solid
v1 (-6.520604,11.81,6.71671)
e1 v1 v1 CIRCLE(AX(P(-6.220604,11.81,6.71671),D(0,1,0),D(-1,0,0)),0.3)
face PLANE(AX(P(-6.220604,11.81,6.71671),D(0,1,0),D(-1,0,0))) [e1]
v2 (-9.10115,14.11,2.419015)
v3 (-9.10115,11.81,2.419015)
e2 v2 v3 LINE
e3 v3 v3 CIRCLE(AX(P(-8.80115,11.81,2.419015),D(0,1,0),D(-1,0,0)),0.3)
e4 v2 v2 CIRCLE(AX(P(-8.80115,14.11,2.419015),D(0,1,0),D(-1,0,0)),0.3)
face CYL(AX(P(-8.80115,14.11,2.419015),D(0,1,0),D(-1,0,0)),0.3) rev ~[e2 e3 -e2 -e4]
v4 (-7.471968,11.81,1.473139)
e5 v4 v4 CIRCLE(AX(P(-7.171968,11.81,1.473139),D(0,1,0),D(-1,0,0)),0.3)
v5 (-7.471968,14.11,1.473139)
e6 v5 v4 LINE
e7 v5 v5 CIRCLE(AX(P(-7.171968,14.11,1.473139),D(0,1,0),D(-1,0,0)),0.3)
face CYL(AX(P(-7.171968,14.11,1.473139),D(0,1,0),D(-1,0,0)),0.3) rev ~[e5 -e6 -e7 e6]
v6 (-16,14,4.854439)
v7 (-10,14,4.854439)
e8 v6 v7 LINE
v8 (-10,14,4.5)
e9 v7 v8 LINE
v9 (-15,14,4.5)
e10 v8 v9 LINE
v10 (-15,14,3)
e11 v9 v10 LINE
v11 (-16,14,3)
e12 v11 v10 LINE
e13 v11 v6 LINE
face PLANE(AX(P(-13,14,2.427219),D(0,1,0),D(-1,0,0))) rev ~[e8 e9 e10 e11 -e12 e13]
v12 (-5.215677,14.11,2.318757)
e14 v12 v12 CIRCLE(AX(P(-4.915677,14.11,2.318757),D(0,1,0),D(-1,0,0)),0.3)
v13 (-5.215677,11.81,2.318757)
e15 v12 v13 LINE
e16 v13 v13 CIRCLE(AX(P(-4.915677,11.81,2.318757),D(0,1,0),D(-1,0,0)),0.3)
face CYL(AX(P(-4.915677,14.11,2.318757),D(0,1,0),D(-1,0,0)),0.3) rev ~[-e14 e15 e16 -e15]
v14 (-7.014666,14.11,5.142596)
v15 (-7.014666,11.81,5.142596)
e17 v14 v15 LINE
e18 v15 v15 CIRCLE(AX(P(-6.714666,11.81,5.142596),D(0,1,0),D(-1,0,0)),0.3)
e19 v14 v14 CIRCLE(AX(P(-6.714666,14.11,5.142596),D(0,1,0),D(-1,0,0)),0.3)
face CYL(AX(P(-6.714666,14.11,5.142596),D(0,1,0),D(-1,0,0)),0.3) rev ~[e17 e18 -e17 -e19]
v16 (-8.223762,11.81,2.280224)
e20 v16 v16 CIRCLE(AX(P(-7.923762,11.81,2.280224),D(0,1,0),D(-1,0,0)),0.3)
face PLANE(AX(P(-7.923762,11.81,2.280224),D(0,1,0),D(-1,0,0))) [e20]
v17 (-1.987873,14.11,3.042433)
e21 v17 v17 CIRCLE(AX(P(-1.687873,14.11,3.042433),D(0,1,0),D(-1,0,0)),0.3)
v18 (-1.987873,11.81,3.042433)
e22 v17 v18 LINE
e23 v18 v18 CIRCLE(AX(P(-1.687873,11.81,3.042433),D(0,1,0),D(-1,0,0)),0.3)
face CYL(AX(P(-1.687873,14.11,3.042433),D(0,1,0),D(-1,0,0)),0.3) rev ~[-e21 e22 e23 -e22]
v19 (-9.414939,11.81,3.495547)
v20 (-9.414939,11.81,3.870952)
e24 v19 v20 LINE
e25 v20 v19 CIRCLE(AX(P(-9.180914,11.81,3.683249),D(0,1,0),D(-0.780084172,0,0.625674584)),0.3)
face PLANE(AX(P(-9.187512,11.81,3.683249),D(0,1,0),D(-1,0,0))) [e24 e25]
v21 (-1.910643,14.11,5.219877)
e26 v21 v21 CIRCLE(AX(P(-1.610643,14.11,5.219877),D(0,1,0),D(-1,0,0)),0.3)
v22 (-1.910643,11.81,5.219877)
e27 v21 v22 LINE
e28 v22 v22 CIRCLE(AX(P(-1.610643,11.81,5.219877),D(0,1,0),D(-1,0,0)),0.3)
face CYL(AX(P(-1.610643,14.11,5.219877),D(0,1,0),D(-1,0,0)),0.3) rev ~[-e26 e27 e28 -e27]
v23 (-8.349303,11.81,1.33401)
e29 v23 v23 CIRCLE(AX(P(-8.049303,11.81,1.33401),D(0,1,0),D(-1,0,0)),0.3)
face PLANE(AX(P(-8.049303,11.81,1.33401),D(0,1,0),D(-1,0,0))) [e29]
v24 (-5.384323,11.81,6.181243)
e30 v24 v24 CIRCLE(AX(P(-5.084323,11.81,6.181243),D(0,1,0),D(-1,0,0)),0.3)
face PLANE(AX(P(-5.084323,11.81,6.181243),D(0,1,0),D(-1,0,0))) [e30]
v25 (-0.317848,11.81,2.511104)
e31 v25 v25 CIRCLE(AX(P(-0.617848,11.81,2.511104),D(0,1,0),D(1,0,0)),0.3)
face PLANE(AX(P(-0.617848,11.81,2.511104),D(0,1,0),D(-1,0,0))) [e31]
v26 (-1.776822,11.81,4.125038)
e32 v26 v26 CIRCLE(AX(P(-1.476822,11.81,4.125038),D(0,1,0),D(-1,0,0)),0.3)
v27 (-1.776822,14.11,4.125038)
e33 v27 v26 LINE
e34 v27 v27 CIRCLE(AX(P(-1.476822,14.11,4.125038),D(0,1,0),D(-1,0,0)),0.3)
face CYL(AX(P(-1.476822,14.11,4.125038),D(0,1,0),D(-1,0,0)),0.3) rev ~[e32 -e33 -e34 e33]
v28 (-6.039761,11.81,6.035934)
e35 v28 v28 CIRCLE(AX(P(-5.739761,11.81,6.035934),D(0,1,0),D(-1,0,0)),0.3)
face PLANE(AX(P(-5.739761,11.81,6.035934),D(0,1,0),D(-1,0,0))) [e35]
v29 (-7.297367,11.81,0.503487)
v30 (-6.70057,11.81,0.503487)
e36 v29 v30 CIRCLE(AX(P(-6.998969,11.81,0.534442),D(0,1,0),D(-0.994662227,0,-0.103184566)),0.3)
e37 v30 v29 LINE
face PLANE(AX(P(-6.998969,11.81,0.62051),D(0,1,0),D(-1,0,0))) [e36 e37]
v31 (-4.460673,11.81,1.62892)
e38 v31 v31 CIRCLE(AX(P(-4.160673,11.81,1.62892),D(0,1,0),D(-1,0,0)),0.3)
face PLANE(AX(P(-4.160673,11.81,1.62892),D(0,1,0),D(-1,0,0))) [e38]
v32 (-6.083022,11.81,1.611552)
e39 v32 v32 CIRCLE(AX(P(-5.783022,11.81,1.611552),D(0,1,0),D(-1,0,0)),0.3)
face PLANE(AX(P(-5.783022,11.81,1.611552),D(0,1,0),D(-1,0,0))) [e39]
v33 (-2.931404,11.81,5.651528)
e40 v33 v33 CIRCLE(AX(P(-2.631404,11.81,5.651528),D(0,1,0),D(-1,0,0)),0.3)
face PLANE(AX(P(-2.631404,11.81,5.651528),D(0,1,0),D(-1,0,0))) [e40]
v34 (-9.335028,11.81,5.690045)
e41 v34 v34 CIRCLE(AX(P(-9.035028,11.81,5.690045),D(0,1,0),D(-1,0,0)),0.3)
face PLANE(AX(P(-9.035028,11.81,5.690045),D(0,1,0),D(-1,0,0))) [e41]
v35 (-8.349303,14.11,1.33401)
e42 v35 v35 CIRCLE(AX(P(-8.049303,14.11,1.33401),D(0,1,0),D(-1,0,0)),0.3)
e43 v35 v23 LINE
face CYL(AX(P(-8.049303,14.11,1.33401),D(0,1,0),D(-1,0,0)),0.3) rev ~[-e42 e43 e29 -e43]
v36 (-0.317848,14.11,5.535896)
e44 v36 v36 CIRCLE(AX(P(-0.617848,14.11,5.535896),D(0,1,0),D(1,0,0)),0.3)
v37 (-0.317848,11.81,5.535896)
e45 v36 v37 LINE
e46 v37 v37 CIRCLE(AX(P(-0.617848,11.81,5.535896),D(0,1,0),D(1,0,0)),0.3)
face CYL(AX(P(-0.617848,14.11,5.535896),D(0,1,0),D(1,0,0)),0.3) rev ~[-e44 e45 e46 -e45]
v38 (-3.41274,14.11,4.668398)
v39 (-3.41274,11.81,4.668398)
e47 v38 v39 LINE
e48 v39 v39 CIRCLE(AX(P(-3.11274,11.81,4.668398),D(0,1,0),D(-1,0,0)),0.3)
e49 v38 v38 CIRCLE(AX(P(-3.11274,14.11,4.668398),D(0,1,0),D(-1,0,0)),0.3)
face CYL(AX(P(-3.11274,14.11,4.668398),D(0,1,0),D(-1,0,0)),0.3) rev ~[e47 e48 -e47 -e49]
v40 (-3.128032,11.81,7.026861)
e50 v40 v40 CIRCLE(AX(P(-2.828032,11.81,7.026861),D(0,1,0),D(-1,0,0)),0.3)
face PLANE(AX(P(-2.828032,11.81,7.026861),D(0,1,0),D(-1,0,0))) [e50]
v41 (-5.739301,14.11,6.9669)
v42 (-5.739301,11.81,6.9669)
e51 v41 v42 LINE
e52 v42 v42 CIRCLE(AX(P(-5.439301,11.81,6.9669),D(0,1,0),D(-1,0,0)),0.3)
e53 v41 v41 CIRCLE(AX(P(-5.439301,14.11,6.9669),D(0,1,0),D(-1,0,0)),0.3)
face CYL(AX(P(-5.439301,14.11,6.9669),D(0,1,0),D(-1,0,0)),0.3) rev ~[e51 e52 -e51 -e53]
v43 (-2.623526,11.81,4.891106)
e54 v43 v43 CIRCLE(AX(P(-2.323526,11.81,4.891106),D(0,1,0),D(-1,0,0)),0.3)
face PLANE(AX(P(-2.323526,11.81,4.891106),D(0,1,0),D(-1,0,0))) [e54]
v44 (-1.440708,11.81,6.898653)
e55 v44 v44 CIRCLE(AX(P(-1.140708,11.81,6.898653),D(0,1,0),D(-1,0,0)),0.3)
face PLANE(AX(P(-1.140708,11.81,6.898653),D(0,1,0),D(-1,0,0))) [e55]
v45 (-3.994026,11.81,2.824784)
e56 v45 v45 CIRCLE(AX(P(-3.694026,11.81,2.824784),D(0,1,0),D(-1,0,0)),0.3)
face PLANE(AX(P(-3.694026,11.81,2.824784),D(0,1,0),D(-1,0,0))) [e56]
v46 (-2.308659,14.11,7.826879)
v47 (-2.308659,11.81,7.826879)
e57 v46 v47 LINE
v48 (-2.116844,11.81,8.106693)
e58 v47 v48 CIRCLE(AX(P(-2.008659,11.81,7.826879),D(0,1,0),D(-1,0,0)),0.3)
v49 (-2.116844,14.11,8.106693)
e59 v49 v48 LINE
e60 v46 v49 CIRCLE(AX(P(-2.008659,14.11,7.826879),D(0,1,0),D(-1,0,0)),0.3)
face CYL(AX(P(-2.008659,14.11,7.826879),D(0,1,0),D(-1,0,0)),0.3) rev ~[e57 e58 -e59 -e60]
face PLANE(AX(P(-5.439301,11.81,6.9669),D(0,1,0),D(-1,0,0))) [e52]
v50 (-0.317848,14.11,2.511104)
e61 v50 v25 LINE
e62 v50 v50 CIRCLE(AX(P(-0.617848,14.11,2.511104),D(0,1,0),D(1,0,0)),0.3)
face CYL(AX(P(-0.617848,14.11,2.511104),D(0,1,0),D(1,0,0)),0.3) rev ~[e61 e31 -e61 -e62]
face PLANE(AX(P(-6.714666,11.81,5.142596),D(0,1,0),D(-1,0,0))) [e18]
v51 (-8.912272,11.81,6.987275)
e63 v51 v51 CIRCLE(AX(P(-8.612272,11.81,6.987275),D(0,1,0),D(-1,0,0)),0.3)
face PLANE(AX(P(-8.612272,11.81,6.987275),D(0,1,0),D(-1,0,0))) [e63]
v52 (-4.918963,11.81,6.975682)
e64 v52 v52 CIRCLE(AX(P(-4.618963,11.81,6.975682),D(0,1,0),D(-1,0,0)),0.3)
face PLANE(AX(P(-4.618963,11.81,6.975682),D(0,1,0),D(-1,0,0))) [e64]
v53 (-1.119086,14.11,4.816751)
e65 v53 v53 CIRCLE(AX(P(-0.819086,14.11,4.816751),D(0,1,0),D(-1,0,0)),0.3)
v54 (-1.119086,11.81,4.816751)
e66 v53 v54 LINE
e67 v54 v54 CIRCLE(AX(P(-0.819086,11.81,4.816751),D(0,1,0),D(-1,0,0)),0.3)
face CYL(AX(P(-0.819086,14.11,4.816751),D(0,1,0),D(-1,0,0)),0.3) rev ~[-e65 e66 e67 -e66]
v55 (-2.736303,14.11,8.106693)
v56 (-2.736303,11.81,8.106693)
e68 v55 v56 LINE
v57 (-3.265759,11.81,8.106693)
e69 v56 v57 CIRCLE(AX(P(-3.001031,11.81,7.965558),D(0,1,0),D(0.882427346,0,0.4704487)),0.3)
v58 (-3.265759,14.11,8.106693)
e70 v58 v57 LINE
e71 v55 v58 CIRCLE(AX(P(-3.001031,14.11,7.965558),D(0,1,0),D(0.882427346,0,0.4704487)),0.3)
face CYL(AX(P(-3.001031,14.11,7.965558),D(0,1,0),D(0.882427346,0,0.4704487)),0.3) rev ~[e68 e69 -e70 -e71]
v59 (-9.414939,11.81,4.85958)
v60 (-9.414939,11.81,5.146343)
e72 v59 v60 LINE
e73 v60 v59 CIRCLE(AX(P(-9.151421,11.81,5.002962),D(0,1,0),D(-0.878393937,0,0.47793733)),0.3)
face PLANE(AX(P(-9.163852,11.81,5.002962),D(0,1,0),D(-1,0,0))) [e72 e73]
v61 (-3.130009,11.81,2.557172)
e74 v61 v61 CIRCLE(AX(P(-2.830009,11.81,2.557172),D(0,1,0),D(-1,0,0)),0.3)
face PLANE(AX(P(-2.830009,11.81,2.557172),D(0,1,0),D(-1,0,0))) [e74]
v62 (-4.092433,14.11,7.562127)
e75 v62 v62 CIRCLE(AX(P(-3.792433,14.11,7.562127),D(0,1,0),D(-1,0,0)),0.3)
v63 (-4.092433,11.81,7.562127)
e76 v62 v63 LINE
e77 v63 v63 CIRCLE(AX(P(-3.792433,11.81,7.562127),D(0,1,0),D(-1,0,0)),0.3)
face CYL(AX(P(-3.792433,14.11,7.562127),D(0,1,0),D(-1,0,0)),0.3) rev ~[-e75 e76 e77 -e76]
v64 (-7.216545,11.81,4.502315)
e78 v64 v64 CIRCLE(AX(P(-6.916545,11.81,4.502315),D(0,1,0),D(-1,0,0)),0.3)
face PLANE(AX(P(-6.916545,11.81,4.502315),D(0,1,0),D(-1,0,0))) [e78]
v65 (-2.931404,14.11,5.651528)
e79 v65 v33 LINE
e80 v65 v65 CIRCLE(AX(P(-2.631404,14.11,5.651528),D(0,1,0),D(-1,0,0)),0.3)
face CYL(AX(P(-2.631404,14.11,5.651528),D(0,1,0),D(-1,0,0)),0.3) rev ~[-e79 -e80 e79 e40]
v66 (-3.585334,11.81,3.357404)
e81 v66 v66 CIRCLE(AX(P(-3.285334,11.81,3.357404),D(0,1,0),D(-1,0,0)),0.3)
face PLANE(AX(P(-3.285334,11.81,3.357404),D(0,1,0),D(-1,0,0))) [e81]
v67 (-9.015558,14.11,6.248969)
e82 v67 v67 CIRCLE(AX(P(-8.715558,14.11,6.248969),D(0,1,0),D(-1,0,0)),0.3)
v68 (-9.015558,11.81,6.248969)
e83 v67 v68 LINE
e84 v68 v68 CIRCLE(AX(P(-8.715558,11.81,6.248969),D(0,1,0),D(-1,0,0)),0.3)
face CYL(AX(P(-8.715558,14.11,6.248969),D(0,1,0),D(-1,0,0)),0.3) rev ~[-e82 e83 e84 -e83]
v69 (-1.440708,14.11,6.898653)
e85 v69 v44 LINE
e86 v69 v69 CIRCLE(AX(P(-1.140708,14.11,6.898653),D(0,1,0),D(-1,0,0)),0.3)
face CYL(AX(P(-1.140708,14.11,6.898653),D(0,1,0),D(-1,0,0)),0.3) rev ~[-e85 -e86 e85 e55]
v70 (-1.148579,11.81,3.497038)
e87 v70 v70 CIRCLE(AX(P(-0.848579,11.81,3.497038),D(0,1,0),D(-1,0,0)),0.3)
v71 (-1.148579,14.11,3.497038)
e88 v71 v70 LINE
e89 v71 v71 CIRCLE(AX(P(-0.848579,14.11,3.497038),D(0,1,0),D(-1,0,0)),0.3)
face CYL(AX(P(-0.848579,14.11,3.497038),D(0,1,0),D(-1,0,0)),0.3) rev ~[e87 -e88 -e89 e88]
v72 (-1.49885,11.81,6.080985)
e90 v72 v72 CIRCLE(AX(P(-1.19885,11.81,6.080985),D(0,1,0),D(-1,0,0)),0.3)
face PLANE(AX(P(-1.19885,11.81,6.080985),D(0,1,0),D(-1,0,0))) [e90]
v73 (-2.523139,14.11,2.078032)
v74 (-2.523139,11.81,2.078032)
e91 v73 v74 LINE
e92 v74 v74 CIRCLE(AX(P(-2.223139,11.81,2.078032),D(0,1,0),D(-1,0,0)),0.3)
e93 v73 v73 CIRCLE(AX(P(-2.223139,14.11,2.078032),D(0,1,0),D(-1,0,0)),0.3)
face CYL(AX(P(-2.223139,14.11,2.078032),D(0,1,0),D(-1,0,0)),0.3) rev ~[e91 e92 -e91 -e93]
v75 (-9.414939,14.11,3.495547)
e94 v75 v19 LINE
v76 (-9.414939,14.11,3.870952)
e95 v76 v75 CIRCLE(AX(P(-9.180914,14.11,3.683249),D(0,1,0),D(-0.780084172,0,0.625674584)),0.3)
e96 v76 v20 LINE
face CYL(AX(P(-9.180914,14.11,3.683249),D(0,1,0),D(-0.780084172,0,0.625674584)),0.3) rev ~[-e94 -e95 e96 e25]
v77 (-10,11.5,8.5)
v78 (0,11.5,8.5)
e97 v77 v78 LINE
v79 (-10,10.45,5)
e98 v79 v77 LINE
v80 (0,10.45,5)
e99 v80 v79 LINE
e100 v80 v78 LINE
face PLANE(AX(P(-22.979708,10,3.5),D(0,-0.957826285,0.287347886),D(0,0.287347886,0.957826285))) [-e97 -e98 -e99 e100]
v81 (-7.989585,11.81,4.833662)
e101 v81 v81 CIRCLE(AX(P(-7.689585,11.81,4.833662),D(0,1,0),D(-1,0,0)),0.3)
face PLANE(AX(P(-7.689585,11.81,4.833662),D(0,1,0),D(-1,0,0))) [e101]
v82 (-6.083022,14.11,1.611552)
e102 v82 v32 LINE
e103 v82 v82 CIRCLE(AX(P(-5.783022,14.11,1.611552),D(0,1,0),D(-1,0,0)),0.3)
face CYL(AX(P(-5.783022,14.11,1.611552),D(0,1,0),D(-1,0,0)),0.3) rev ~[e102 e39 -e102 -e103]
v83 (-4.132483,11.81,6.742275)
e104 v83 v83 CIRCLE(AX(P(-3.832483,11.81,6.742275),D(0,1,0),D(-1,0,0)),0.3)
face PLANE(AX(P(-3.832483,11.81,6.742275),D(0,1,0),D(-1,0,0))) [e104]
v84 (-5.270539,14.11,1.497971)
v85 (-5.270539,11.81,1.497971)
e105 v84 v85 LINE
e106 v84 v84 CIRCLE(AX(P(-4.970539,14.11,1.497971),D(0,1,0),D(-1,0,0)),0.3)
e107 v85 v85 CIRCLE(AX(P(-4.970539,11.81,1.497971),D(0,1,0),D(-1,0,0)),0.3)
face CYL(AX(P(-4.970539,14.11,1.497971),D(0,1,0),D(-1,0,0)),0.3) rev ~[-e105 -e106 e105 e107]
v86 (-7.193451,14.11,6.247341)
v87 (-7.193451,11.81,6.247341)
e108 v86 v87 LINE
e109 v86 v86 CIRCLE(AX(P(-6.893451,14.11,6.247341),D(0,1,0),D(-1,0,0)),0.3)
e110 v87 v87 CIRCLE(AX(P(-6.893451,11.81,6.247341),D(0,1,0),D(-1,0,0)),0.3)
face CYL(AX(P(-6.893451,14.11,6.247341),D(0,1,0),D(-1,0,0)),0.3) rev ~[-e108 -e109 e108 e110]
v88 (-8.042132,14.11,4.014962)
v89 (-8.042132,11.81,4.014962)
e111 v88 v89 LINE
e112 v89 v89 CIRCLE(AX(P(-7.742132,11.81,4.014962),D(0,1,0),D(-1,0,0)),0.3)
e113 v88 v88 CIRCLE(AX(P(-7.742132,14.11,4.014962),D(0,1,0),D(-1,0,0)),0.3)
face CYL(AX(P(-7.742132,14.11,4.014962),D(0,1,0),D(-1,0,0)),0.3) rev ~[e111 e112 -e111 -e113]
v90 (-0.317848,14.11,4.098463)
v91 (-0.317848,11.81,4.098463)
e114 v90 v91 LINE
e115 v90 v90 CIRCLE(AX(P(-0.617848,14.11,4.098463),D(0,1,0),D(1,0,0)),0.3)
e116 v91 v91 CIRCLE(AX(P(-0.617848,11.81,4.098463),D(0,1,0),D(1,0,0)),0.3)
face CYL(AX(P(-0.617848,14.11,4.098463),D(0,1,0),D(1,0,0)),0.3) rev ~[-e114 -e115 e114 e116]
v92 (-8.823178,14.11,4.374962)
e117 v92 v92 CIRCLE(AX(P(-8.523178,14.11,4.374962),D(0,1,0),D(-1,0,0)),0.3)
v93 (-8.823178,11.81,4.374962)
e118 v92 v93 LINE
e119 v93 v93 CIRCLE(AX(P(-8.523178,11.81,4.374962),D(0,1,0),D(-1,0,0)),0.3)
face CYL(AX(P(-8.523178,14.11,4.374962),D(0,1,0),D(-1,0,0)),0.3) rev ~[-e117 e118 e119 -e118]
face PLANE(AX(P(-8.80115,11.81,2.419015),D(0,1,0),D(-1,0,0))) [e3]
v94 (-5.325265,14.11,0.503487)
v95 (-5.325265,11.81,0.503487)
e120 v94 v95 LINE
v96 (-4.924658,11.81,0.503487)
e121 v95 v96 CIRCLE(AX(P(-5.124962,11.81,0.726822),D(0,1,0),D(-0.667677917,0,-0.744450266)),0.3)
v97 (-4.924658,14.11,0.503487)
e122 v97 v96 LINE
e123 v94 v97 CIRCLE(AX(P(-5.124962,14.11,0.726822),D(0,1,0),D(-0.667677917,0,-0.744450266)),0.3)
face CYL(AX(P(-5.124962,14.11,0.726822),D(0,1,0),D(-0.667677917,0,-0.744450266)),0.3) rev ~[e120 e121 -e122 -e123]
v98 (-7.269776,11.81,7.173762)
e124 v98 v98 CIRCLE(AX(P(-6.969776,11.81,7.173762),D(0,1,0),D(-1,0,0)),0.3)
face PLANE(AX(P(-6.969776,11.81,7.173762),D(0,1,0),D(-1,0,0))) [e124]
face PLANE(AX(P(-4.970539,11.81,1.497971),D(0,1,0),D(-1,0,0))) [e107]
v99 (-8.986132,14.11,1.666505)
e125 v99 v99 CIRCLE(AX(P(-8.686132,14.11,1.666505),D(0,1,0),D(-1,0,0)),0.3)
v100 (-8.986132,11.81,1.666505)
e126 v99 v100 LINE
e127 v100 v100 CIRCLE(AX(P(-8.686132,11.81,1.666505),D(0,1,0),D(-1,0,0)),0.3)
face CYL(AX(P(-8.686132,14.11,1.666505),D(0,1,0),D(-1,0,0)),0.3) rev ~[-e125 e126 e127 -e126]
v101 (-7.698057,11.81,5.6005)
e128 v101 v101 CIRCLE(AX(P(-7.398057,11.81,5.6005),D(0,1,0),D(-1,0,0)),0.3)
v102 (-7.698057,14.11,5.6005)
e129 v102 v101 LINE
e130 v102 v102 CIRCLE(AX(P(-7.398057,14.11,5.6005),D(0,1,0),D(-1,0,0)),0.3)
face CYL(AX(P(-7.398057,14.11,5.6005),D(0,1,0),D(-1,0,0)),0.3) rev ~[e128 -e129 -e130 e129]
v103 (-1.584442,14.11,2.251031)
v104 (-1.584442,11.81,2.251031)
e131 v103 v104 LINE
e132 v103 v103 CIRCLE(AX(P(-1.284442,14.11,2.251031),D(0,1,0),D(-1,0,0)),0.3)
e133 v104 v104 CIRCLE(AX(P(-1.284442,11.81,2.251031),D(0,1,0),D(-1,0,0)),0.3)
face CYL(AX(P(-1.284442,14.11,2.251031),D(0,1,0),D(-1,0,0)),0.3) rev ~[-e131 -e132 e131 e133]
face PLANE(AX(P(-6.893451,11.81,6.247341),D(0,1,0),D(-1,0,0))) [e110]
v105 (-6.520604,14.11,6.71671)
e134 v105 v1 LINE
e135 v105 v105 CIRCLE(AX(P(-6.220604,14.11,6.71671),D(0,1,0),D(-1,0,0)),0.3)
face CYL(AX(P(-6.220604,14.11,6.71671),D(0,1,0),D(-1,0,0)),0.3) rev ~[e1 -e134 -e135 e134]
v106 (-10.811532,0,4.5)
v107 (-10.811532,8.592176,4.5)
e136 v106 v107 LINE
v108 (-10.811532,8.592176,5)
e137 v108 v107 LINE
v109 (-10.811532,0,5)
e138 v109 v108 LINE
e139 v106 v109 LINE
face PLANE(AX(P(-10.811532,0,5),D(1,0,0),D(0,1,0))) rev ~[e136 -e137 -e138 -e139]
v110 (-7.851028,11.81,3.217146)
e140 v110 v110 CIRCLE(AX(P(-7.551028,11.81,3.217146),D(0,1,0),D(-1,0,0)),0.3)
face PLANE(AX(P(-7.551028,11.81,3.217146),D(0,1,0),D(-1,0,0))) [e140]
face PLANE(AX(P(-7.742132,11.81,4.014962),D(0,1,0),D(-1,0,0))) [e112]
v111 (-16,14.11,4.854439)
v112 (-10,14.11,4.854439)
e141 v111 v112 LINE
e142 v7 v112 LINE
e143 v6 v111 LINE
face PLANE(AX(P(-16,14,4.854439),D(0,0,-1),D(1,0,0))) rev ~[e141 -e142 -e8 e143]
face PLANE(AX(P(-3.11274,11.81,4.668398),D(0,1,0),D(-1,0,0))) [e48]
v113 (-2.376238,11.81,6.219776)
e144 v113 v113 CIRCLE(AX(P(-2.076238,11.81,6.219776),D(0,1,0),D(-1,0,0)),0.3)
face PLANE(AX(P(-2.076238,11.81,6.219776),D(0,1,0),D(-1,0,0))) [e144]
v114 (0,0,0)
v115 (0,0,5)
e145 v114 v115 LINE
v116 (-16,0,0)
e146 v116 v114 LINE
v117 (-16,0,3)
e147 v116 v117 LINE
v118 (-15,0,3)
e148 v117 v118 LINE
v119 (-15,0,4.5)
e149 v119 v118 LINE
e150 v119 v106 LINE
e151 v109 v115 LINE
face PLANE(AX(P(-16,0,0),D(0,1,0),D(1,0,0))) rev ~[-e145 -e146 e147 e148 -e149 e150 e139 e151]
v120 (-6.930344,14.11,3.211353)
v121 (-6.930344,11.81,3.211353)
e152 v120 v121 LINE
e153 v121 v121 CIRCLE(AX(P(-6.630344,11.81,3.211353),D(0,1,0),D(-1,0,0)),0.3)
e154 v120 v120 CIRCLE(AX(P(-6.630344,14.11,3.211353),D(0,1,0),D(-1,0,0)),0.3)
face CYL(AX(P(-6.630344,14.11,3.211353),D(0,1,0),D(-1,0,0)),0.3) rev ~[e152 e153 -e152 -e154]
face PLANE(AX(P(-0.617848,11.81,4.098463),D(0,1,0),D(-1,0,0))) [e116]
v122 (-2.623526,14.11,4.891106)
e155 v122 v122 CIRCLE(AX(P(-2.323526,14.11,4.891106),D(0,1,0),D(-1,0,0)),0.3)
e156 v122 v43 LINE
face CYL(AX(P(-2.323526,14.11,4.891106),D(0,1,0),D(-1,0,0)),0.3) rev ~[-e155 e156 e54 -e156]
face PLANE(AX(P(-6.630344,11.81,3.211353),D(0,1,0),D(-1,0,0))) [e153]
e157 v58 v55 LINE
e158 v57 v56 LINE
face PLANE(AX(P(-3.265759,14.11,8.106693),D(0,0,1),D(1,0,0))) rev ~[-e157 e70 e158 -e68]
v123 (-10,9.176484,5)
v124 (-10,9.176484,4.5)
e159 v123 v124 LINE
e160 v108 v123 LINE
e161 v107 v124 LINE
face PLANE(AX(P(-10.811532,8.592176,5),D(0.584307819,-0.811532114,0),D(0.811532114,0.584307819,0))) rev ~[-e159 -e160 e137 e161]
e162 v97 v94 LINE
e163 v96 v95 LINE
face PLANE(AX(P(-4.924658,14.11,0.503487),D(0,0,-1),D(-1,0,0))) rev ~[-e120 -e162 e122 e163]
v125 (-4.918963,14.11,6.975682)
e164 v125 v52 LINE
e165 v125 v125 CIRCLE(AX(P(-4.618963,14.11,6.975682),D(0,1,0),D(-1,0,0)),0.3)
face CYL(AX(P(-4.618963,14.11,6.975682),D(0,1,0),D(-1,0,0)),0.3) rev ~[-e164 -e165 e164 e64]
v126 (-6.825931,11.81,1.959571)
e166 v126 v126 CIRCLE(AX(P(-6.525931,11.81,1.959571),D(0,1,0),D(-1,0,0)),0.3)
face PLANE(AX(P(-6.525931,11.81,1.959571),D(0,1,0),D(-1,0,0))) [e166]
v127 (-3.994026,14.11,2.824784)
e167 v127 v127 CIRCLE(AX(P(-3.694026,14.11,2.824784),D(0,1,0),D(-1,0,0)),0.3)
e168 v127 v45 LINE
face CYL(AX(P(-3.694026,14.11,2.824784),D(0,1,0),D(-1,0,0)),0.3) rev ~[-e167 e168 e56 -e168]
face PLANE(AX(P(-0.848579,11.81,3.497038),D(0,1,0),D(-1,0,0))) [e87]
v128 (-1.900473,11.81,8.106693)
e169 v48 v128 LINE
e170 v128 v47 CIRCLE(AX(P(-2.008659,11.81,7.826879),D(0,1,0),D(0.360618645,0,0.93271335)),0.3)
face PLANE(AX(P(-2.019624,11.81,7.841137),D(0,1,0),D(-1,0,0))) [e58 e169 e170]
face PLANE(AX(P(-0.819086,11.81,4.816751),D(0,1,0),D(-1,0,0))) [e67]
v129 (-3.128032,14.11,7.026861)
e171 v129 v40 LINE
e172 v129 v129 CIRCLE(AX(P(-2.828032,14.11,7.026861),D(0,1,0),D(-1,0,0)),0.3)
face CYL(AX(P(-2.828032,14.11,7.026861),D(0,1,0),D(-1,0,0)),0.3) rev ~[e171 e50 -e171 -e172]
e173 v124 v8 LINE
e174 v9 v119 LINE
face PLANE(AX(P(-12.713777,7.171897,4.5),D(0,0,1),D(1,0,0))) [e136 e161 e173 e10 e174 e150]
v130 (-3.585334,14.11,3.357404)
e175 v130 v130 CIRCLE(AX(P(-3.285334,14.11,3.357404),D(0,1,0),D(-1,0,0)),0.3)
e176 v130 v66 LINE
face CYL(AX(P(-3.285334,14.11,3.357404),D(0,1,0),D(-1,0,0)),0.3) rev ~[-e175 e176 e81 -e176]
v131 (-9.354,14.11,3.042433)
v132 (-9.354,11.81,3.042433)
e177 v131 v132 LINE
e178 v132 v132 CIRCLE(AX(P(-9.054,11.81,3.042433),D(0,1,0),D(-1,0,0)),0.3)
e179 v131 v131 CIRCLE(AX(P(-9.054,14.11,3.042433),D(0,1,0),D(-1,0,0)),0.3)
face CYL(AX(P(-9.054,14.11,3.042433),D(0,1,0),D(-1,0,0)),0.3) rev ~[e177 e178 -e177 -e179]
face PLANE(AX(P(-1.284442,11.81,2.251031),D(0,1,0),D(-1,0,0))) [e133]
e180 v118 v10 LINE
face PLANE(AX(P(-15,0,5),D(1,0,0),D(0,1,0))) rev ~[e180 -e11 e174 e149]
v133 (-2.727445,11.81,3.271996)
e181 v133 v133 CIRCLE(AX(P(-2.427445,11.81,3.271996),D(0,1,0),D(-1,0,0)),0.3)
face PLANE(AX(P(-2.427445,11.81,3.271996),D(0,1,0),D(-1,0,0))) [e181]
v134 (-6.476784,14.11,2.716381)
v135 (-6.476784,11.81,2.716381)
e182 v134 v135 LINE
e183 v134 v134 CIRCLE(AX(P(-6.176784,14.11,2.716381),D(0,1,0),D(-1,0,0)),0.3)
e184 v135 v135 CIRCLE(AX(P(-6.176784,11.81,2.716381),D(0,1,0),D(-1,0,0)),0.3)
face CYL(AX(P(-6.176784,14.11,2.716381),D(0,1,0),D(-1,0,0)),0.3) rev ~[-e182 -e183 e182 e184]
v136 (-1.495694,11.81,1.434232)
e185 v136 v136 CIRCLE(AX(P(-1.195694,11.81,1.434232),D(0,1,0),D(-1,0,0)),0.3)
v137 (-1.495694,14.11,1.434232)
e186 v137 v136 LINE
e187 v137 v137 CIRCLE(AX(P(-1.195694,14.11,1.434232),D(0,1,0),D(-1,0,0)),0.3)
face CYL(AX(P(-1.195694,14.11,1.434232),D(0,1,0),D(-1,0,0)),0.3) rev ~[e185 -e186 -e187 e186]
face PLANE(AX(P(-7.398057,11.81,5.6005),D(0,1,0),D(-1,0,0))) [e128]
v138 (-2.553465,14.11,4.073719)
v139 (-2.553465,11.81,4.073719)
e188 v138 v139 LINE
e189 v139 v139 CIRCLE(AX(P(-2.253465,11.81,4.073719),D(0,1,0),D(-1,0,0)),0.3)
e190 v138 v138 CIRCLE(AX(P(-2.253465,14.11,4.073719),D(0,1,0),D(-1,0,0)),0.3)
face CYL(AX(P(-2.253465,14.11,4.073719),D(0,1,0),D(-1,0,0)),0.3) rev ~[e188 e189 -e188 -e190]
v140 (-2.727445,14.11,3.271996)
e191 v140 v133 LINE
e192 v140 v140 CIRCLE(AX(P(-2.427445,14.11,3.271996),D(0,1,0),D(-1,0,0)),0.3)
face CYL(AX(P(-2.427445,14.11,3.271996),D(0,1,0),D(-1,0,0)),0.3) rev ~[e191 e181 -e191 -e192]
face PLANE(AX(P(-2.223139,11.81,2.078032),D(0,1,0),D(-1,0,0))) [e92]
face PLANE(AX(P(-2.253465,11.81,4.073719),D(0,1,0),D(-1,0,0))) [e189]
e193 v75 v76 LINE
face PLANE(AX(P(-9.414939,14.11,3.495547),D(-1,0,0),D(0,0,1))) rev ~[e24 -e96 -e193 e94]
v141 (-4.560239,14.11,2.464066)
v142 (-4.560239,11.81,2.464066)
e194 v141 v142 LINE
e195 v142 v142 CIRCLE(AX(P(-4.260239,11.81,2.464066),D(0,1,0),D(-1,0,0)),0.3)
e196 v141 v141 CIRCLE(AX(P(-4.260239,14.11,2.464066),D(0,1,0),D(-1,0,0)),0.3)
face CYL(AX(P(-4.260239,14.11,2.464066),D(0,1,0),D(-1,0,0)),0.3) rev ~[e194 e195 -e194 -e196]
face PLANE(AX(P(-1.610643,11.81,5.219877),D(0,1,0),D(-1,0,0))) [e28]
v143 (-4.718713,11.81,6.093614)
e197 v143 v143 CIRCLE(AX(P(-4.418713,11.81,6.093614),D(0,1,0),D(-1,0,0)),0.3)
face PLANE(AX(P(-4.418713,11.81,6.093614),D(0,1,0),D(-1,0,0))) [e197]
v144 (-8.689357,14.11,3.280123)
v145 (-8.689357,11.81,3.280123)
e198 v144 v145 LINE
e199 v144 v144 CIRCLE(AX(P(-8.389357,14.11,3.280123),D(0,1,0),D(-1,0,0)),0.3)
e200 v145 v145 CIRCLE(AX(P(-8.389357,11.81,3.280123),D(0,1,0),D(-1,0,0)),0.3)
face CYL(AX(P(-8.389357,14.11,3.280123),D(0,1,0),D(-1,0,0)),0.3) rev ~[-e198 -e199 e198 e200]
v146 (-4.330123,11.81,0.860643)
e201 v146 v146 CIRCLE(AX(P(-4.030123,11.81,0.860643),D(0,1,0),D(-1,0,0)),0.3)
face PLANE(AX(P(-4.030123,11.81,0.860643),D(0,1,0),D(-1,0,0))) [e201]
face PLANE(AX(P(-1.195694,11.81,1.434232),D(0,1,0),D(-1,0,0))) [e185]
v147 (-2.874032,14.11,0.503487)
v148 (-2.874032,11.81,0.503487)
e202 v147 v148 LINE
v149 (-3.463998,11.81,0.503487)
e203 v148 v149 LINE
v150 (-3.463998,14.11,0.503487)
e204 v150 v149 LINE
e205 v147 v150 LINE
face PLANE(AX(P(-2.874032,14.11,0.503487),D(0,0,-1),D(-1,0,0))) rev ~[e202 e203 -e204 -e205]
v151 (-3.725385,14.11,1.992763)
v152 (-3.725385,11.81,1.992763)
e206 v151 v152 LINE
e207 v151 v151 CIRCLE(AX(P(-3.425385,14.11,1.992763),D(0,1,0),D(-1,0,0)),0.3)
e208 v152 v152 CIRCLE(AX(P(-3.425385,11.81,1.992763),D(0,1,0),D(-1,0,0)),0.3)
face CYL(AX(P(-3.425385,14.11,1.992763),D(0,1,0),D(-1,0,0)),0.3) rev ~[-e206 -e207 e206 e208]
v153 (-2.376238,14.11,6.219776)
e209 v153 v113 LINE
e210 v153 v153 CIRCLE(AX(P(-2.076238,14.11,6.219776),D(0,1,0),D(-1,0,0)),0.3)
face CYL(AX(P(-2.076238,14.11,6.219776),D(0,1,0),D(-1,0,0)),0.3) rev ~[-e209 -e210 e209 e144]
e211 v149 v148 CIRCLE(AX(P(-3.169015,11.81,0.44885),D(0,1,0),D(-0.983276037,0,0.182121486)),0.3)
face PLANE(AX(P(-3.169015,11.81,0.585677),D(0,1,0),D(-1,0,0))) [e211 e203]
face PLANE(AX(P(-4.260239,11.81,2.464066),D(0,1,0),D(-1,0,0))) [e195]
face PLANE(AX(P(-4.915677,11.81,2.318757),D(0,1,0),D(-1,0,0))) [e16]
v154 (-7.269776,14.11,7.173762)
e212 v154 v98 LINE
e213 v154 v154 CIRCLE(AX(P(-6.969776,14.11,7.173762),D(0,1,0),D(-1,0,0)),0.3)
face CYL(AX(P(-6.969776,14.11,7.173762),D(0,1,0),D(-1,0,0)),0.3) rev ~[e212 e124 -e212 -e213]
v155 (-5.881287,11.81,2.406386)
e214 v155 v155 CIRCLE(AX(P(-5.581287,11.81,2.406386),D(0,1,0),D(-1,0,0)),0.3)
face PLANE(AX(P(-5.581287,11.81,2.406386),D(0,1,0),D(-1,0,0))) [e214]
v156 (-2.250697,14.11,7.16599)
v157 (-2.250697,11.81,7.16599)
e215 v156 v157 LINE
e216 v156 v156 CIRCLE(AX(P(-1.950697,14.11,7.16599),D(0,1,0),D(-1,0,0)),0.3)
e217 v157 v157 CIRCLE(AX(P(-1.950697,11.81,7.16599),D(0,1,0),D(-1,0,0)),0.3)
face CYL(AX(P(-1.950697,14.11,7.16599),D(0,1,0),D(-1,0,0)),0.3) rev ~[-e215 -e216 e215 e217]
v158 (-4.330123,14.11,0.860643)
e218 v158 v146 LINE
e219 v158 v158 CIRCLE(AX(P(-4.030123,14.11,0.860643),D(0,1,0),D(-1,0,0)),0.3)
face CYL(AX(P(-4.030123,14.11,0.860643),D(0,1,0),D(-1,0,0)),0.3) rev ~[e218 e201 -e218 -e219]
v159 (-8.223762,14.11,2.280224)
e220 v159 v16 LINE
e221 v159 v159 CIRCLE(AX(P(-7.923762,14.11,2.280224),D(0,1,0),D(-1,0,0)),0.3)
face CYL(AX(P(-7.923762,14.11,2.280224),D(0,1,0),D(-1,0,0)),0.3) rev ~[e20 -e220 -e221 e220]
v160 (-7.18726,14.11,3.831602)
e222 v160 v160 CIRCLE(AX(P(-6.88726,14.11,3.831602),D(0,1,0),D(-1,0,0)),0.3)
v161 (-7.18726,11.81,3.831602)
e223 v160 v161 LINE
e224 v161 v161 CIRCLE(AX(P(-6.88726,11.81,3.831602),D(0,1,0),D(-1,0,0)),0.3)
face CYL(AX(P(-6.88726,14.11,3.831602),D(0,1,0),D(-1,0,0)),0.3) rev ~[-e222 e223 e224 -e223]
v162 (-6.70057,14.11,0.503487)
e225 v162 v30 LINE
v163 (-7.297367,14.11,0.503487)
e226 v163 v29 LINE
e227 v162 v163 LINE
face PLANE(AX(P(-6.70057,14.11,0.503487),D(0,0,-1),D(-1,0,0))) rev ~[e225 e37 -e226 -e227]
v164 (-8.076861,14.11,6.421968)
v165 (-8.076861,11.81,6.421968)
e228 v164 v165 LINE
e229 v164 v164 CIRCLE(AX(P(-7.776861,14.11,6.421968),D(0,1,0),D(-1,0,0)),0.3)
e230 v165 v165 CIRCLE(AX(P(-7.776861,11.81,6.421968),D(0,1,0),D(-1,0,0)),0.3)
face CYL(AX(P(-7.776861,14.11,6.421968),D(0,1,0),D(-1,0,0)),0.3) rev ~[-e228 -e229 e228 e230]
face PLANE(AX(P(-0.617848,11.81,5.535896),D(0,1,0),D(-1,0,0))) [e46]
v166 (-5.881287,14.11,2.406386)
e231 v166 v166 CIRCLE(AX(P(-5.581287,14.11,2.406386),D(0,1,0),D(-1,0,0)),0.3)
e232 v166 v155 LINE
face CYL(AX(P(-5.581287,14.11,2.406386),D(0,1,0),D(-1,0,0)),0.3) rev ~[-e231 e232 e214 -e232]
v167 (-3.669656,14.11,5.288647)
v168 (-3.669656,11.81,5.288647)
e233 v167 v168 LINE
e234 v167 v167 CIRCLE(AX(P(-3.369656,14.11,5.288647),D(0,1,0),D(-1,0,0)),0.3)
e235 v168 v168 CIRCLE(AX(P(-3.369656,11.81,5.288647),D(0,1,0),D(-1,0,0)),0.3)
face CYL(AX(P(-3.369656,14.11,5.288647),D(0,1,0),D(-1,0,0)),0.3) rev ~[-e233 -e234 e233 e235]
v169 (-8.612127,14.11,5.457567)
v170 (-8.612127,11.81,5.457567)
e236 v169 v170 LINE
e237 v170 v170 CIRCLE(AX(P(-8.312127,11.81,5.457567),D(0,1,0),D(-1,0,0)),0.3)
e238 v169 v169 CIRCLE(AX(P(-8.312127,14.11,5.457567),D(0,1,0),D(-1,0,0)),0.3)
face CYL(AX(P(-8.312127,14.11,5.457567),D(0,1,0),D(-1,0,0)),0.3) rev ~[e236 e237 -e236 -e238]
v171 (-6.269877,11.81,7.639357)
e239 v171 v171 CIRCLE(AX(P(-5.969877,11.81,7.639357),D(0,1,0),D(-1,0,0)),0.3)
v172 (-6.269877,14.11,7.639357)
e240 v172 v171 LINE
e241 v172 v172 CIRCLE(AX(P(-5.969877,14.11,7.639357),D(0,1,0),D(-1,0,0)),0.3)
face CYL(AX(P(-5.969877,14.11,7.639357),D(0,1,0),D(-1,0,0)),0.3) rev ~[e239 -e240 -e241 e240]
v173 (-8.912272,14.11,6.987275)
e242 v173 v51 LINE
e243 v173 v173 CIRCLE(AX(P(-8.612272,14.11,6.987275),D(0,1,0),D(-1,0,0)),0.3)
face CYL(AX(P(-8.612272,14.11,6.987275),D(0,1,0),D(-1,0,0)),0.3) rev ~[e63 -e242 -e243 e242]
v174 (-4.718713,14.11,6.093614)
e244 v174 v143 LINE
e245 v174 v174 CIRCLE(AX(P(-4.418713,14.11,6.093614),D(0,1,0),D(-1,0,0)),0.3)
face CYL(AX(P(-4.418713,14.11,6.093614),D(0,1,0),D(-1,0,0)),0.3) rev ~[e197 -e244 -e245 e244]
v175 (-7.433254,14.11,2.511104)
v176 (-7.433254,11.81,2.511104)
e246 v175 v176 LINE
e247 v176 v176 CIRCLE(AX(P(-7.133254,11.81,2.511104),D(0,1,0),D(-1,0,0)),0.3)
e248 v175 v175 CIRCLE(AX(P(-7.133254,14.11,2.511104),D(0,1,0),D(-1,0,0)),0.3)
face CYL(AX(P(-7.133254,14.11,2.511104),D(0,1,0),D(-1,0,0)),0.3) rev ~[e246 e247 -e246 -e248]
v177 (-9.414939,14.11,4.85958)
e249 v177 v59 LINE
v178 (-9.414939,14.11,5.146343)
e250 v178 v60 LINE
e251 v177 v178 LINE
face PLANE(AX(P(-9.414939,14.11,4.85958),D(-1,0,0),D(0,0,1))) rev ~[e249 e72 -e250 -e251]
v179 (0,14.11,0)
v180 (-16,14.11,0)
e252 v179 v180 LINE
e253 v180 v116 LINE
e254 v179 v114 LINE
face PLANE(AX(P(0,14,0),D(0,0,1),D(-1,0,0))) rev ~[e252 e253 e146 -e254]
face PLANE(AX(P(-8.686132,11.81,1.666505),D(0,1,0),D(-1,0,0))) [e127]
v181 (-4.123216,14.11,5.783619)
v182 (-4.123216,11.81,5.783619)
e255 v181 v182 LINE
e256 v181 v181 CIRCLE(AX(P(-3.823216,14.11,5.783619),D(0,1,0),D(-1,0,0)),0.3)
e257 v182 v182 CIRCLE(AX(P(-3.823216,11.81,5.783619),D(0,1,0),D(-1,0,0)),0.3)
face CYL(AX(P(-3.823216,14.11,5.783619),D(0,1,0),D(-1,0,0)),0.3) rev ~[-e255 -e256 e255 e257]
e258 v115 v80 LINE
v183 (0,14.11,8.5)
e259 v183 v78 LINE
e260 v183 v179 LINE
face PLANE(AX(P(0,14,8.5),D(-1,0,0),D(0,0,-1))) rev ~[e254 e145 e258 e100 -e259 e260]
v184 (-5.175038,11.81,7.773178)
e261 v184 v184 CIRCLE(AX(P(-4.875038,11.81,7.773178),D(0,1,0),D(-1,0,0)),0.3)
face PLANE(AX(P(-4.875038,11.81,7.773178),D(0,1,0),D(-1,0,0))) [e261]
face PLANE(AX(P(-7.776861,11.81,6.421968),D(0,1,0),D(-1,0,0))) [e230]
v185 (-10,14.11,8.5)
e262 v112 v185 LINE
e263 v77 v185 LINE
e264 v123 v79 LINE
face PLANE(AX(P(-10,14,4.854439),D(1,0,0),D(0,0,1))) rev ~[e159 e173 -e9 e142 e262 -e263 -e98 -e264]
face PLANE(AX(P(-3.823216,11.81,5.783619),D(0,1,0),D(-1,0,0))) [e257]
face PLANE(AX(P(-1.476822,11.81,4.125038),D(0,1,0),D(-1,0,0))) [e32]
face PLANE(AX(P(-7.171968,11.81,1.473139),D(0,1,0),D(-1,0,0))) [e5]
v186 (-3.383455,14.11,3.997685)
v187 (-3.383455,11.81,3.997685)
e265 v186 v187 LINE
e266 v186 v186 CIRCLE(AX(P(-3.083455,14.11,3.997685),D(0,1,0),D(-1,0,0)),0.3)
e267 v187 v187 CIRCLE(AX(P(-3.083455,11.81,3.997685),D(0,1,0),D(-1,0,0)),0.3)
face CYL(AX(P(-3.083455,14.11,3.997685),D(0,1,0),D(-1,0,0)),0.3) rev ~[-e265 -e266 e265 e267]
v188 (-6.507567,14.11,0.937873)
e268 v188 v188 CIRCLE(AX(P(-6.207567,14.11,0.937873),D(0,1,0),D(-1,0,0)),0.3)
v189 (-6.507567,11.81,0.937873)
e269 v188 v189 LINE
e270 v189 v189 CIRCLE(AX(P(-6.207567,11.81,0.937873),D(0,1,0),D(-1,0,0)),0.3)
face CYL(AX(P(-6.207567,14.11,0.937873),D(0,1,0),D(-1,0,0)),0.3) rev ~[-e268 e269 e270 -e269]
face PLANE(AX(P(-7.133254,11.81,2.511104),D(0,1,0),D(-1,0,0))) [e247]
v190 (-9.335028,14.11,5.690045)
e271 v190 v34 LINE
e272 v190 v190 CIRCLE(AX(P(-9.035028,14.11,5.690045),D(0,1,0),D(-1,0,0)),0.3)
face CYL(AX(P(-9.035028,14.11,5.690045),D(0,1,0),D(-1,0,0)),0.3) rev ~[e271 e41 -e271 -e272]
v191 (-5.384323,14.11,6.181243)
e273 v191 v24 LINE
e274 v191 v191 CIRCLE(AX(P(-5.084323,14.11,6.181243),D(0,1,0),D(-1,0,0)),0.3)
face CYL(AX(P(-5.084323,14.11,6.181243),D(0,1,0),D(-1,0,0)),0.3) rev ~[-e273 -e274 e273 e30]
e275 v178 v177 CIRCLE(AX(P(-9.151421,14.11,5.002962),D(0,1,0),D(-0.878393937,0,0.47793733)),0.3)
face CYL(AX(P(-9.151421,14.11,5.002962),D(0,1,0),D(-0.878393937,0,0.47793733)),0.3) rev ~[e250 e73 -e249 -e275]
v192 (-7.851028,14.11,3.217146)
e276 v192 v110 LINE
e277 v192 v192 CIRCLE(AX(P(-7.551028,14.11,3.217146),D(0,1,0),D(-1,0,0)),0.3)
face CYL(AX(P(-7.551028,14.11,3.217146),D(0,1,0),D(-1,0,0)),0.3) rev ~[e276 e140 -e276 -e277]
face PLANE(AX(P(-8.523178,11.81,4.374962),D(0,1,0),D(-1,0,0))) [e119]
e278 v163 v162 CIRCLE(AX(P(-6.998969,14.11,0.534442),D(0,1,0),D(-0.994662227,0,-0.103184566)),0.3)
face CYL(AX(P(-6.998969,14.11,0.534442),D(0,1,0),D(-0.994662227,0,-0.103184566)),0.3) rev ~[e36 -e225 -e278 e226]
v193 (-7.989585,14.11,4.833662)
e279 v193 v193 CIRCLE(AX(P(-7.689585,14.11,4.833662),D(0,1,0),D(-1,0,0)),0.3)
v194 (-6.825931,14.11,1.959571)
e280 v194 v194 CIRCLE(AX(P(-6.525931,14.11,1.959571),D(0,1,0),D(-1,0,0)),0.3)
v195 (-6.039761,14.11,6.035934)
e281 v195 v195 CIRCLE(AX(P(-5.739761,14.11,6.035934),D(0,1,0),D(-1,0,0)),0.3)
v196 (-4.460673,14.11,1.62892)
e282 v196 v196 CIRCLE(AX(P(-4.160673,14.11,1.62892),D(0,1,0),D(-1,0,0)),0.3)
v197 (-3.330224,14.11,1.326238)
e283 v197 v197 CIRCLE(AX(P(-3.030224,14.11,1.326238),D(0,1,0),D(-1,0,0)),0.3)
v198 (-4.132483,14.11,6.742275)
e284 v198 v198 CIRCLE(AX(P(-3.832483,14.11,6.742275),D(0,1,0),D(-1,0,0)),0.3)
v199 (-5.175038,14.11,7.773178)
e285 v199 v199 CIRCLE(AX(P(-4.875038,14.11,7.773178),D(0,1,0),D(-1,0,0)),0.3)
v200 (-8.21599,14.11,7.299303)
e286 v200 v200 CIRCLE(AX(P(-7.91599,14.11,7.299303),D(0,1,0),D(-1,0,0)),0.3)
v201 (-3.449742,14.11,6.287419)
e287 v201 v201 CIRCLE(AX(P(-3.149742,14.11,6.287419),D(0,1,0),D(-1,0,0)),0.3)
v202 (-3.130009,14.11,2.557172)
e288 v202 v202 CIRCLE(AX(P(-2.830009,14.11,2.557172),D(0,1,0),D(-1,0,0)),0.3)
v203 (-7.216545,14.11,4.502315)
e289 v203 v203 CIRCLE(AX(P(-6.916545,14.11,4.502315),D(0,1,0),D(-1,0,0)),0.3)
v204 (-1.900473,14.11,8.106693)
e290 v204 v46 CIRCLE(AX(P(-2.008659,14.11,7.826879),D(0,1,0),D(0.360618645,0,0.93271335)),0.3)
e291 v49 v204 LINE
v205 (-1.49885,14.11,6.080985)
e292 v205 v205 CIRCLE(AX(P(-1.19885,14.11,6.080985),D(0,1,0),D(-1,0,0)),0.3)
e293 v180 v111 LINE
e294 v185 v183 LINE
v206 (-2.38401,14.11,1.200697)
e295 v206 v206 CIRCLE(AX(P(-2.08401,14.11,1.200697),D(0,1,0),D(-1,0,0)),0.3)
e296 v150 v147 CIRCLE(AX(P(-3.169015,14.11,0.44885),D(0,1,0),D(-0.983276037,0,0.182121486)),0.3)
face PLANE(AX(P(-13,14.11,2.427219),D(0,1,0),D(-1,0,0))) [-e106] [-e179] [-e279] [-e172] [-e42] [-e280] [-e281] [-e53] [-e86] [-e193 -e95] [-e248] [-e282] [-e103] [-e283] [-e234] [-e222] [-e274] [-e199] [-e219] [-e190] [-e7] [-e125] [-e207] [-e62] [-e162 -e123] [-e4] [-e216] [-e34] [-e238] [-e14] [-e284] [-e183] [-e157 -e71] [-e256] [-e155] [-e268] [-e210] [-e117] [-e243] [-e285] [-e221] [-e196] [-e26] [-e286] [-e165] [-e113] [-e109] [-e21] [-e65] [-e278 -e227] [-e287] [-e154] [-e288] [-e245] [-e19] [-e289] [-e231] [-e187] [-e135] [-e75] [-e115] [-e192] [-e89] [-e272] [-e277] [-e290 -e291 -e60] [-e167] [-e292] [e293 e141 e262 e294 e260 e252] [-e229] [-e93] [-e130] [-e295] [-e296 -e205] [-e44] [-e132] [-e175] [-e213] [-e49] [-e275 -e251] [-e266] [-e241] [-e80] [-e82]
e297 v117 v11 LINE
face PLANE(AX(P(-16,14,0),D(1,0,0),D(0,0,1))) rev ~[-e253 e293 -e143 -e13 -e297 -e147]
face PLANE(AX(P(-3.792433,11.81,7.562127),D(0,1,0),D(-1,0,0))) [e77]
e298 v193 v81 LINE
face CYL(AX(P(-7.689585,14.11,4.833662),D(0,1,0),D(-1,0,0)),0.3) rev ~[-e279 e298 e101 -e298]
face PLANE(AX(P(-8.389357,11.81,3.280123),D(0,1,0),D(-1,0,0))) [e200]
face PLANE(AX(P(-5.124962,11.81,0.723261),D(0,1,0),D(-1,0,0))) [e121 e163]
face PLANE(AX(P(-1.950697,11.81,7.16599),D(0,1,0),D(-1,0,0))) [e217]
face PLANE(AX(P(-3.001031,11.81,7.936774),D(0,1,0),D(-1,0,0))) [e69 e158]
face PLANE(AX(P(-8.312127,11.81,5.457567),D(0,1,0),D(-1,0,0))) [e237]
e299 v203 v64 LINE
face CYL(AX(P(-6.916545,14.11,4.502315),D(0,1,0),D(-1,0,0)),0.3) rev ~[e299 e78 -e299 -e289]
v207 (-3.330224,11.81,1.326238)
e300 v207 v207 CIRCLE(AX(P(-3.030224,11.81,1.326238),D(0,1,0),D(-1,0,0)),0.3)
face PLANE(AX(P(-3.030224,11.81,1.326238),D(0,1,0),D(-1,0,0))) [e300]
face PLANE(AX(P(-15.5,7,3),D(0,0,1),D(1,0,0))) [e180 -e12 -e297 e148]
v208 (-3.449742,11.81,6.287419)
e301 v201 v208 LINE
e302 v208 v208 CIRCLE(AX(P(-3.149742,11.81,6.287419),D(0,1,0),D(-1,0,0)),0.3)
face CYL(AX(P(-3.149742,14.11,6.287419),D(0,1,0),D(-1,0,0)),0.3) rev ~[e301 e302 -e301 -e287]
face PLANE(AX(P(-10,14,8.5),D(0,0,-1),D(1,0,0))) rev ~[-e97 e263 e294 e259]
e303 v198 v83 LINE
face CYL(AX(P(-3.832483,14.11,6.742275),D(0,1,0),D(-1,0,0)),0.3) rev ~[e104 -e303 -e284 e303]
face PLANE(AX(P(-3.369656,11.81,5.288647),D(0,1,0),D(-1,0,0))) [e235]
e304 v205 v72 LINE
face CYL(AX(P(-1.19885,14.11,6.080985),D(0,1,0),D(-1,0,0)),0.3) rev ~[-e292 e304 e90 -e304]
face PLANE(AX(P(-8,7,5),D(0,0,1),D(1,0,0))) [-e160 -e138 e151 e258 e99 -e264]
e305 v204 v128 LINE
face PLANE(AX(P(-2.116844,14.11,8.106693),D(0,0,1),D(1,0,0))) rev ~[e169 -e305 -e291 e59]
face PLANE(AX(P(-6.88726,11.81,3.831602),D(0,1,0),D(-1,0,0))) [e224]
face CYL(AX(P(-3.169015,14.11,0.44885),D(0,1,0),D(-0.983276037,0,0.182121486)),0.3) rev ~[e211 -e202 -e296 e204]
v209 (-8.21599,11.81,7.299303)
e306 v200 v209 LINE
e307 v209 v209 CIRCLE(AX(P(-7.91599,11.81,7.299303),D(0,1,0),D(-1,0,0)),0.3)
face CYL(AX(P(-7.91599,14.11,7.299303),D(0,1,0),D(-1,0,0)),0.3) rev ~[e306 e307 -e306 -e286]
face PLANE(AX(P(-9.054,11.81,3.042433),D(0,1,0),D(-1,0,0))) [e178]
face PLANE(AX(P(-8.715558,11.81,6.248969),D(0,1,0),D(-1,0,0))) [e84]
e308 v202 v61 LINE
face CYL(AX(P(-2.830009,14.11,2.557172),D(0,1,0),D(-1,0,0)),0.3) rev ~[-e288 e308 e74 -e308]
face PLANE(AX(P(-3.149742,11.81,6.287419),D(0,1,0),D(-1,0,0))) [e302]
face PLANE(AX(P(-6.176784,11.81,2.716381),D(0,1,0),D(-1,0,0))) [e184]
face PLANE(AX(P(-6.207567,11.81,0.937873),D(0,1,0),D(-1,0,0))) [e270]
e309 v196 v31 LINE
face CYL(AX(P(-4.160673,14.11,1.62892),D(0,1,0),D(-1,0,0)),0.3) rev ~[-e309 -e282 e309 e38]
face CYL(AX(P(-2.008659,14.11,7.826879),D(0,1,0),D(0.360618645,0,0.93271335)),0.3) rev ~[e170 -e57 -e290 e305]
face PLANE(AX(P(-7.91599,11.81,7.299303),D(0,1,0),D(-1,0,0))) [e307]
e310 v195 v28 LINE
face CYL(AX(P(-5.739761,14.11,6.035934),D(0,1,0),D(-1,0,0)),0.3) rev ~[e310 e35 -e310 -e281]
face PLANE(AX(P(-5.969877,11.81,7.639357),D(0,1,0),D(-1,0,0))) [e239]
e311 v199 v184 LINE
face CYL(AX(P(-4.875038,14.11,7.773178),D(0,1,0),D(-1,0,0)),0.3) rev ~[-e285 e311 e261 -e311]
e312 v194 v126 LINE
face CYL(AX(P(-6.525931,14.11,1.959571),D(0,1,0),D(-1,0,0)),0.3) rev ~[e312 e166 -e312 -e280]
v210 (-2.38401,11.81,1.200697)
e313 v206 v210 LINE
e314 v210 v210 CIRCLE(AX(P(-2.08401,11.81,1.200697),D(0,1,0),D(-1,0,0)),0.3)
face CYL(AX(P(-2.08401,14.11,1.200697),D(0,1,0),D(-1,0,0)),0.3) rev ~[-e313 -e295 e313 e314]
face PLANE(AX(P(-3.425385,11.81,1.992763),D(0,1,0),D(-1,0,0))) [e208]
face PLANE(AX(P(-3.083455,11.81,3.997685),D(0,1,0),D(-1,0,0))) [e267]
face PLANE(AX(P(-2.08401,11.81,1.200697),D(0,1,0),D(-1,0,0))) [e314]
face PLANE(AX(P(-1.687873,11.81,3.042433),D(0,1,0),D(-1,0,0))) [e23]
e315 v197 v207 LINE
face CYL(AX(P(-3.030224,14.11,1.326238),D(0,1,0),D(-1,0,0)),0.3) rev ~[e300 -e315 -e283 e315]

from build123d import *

# Parameters (mm, degrees)
F0_W        = 16
F0_H        = 14
F1_DEPTH    = 5
F2_W        = 1
F2_H        = 14
F3_DEPTH    = 2
F5_DEPTH    = 0.5
F6_W        = 10
F6_H        = 4
F7_DEPTH    = 3.5
F8_T4_DEPTH = 35.959416678
F10_DEPTH   = 0.11
F11_R       = 0.3
F12_DEPTH   = 2.3


# Not quite as in the source:
# - a fillet or chamfer that OpenCascade refuses, or shapes differently, is made with other operations: its cross-section is extruded or revolved along the edge and cut away or added


with BuildPart() as f1:
    # F0 (on Top) → F1 (new body)
    with BuildSketch(Plane.XY):
        with Locations((-8, 7)):
            Rectangle(F0_W, F0_H)
    extrude(amount=F1_DEPTH)

    # F2 (on face) → F3 (cut)
    with BuildSketch(Plane.XY.offset(5)):
        with Locations((-15.5, 7)):
            Rectangle(F2_W, F2_H)
    extrude(amount=-F3_DEPTH, mode=Mode.SUBTRACT)

    # F4 (on face) → F5 (cut, symmetric)
    with BuildSketch(Plane.XY.offset(5)):
        Polygon((-10, 14), (-15, 14), (-15, 0), (-10.8115321142, 0), (-10.8115321142, 8.5921764899), (-10, 9.1764843091), align=None)
    extrude(amount=F5_DEPTH, both=True, mode=Mode.SUBTRACT)

    # F6 (on face) → F7 (join)
    with BuildSketch(Plane.XY.offset(5)):
        with Locations((-5, 12)):
            Rectangle(F6_W, F6_H)
    extrude(amount=F7_DEPTH)

    # F8: chamfer of 5 x 1.5 on 1 edges, made by hand


with BuildPart() as f8_tool2:
    # F8_s3 → F8_t4 (new body)
    with BuildSketch(Plane.YZ.offset(-22.979708339)):
        Polygon((10, 3.5), (11.5, 8.5), (10, 8.5), align=None)
    extrude(amount=F8_T4_DEPTH)

    split(bisect_by=Plane.XY.offset(5), keep=Keep.TOP)


with BuildPart() as f1_1:
    add(f1.part)

    # F8_t1: cut F8_tool2
    add(f8_tool2.part, mode=Mode.SUBTRACT)

    # F9 (on face) → F10 (join)
    with BuildSketch(Plane(origin=(0, 14, 0), x_dir=(-1, 0, 0), z_dir=(0, 1, 0))):
        Polygon((15, 4.8544388264), (10, 4.8544388264), (10, 0), (16, 0), (16, 3), (16, 4.8544388264), align=None)
        Polygon((10, 4.5), (10, 4.8544388264), (10, 8.5), (0, 8.5), (0, 0), (10, 0), align=None)
    extrude(amount=F10_DEPTH)

    # F11 (on face) → F12 (cut)
    with BuildSketch(Plane(origin=(0, 14.11, 0), x_dir=(-1, 0, 0), z_dir=(0, 1, 0))):
        with Locations((1.9506971954, 7.1659904264)):
            Circle(F11_R)
        with Locations((2.8280317048, 7.026860631)):
            Circle(F11_R)
        with Locations((4.8750384645, 7.7731783739)):
            Circle(F11_R)
        with Locations((3.1497415967, 6.2874185075)):
            Circle(F11_R)
        with Locations((2.0762382736, 6.2197762835)):
            Circle(F11_R)
        with BuildLine():
            ThreePointArc((0.9178482584, 2.5111044793), (0.6178482584, 2.8111044793), (0.3178482584, 2.5111044793))
            ThreePointArc((0.3178482584, 2.5111044793), (0.6178482584, 2.2111044793), (0.9178482584, 2.5111044793))
        make_face()
        with Locations((1.2844419159, 2.2510312947)):
            Circle(F11_R)
        with Locations((2.223139369, 2.0780317048)):
            Circle(F11_R)
        with Locations((1.6878734876, 3.0424325256)):
            Circle(F11_R)
        with Locations((2.2534648226, 4.0737193912)):
            Circle(F11_R)
        with Locations((2.3235260528, 4.8911064992)):
            Circle(F11_R)
        with Locations((2.6314037386, 5.6515284814)):
            Circle(F11_R)
        with Locations((1.4768216261, 4.1250384645)):
            Circle(F11_R)
        with BuildLine():
            ThreePointArc((0.9178482584, 4.0984628722), (0.6178482584, 4.3984628722), (0.3178482584, 4.0984628722))
            ThreePointArc((0.3178482584, 4.0984628722), (0.6178482584, 3.7984628722), (0.9178482584, 4.0984628722))
        make_face()
        with Locations((0.8485789713, 3.4970383785)):
            Circle(F11_R)
        with Locations((0.8190860416, 4.816750592)):
            Circle(F11_R)
        with BuildLine():
            ThreePointArc((0.9178482584, 5.5358964019), (0.6178482584, 5.8358964019), (0.3178482584, 5.5358964019))
            ThreePointArc((0.3178482584, 5.5358964019), (0.6178482584, 5.2358964019), (0.9178482584, 5.5358964019))
        make_face()
        with Locations((1.1988501004, 6.0809853088)):
            Circle(F11_R)
        with BuildLine():
            ThreePointArc((2.736303091, 8.1066926941), (3.0010312947, 7.6655580841), (3.2657594984, 8.1066926941))
            Line((3.2657594984, 8.1066926941), (2.736303091, 8.1066926941))
        make_face()
        with BuildLine():
            ThreePointArc((2.3086588338, 7.8268786892), (2.2561014313, 7.9965022753), (2.1168444274, 8.1066926941))
            Line((2.1168444274, 8.1066926941), (1.9004732402, 8.1066926941))
            ThreePointArc((1.9004732402, 8.1066926941), (1.8390352477, 7.5794360918), (2.3086588338, 7.8268786892))
        make_face()
        with Locations((3.7924325256, 7.5621265124)):
            Circle(F11_R)
        with Locations((4.6189634766, 6.9756818416)):
            Circle(F11_R)
        with Locations((3.3696561493, 5.288646793)):
            Circle(F11_R)
        with Locations((3.1127397891, 4.6683982895)):
            Circle(F11_R)
        with Locations((3.8232160392, 5.7836191645)):
            Circle(F11_R)
        with Locations((3.0834548634, 3.9976847774)):
            Circle(F11_R)
        with Locations((3.2853335664, 3.3574042049)):
            Circle(F11_R)
        with Locations((2.8300085443, 2.5571717702)):
            Circle(F11_R)
        with Locations((3.4253850562, 1.9927631688)):
            Circle(F11_R)
        with Locations((2.0840095736, 1.2006971954)):
            Circle(F11_R)
        with Locations((3.0302237165, 1.3262382736)):
            Circle(F11_R)
        with BuildLine():
            ThreePointArc((3.4639975022, 0.5034865462), (3.1690146912, 0.7488501004), (2.8740318802, 0.5034865462))
            Line((2.8740318802, 0.5034865462), (3.4639975022, 0.5034865462))
        make_face()
        with Locations((4.0301234909, 0.8606430113)):
            Circle(F11_R)
        with Locations((4.2602388243, 2.4640656129)):
            Circle(F11_R)
        with Locations((4.9156774171, 2.3187574119)):
            Circle(F11_R)
        with Locations((6.1767839608, 2.7163808355)):
            Circle(F11_R)
        with Locations((6.6303438507, 3.211353207)):
            Circle(F11_R)
        with Locations((6.8872602109, 3.8316017105)):
            Circle(F11_R)
        with Locations((6.9165451366, 4.5023152226)):
            Circle(F11_R)
        with Locations((6.7146664336, 5.1425957951)):
            Circle(F11_R)
        with Locations((5.7397611757, 6.0359343871)):
            Circle(F11_R)
        with Locations((5.0843225829, 6.1812425881)):
            Circle(F11_R)
        with Locations((4.4187134422, 6.0936144309)):
            Circle(F11_R)
        with Locations((6.9697762835, 7.1737617264)):
            Circle(F11_R)
        with Locations((6.2206041032, 6.7167095404)):
            Circle(F11_R)
        with Locations((7.9159904264, 7.2993028046)):
            Circle(F11_R)
        with Locations((8.6122723296, 6.9872750901)):
            Circle(F11_R)
        with Locations((7.776860631, 6.4219682952)):
            Circle(F11_R)
        with Locations((6.8934514885, 6.2473411813)):
            Circle(F11_R)
        with Locations((7.3980573997, 5.600500293)):
            Circle(F11_R)
        with Locations((8.7155580841, 6.2489687053)):
            Circle(F11_R)
        with Locations((9.0350275859, 5.6900447235)):
            Circle(F11_R)
        with Locations((8.3121265124, 5.4575674744)):
            Circle(F11_R)
        with Locations((7.6895853873, 4.8336615271)):
            Circle(F11_R)
        with BuildLine():
            Line((9.4149392098, 4.8595804226), (9.4149392098, 5.1463428204))
            ThreePointArc((9.4149392098, 5.1463428204), (8.8514210287, 5.0029616215), (9.4149392098, 4.8595804226))
        make_face()
        with Locations((7.7421319101, 4.0149618731)):
            Circle(F11_R)
        with Locations((7.5510279791, 3.2171463882)):
            Circle(F11_R)
        with Locations((7.9237617264, 2.2802237165)):
            Circle(F11_R)
        with Locations((7.1332540171, 2.5111044793)):
            Circle(F11_R)
        with Locations((8.8011498996, 2.4190146912)):
            Circle(F11_R)
        with Locations((8.6861317977, 1.6665054718)):
            Circle(F11_R)
        with Locations((8.0493028046, 1.3340095736)):
            Circle(F11_R)
        with Locations((7.1719682952, 1.473139369)):
            Circle(F11_R)
        with Locations((5.7830224588, 1.6115523195)):
            Circle(F11_R)
        with Locations((4.9705388617, 1.4979712257)):
            Circle(F11_R)
        with BuildLine():
            Line((4.9246581604, 0.5034865462), (5.3252649106, 0.5034865462))
            ThreePointArc((5.3252649106, 0.5034865462), (5.1249615355, 1.0268216261), (4.9246581604, 0.5034865462))
        make_face()
        with BuildLine():
            Line((6.7005700373, 0.5034865462), (7.2973673733, 0.5034865462))
            ThreePointArc((7.2973673733, 0.5034865462), (6.9989687053, 0.8344419159), (6.7005700373, 0.5034865462))
        make_face()
        with Locations((6.2075674744, 0.9378734876)):
            Circle(F11_R)
        with Locations((6.5259310741, 1.9595710684)):
            Circle(F11_R)
        with Locations((5.5812865578, 2.4063855691)):
            Circle(F11_R)
        with Locations((4.160673016, 1.6289199655)):
            Circle(F11_R)
        with Locations((9.0539995581, 3.0424325256)):
            Circle(F11_R)
        with Locations((8.3893569887, 3.2801234909)):
            Circle(F11_R)
        with BuildLine():
            Line((9.4149392098, 3.4955470327), (9.4149392098, 3.8709517832))
            ThreePointArc((9.4149392098, 3.8709517832), (8.8809139584, 3.683249408), (9.4149392098, 3.4955470327))
        make_face()
        with Locations((8.5231783739, 4.3749615355)):
            Circle(F11_R)
        with Locations((3.694026347, 2.8247838586)):
            Circle(F11_R)
        with Locations((1.1956938542, 1.4342324575)):
            Circle(F11_R)
        with Locations((2.427445296, 3.2719955888)):
            Circle(F11_R)
        with Locations((1.6106430113, 5.2198765091)):
            Circle(F11_R)
        with Locations((1.1407076381, 6.8986527622)):
            Circle(F11_R)
        with Locations((3.8324830337, 6.7422749581)):
            Circle(F11_R)
        with Locations((5.4393006869, 6.9668999319)):
            Circle(F11_R)
        with Locations((5.9698765091, 7.6393569887)):
            Circle(F11_R)
    extrude(amount=-F12_DEPTH, mode=Mode.SUBTRACT)


solid = f1_1.part
